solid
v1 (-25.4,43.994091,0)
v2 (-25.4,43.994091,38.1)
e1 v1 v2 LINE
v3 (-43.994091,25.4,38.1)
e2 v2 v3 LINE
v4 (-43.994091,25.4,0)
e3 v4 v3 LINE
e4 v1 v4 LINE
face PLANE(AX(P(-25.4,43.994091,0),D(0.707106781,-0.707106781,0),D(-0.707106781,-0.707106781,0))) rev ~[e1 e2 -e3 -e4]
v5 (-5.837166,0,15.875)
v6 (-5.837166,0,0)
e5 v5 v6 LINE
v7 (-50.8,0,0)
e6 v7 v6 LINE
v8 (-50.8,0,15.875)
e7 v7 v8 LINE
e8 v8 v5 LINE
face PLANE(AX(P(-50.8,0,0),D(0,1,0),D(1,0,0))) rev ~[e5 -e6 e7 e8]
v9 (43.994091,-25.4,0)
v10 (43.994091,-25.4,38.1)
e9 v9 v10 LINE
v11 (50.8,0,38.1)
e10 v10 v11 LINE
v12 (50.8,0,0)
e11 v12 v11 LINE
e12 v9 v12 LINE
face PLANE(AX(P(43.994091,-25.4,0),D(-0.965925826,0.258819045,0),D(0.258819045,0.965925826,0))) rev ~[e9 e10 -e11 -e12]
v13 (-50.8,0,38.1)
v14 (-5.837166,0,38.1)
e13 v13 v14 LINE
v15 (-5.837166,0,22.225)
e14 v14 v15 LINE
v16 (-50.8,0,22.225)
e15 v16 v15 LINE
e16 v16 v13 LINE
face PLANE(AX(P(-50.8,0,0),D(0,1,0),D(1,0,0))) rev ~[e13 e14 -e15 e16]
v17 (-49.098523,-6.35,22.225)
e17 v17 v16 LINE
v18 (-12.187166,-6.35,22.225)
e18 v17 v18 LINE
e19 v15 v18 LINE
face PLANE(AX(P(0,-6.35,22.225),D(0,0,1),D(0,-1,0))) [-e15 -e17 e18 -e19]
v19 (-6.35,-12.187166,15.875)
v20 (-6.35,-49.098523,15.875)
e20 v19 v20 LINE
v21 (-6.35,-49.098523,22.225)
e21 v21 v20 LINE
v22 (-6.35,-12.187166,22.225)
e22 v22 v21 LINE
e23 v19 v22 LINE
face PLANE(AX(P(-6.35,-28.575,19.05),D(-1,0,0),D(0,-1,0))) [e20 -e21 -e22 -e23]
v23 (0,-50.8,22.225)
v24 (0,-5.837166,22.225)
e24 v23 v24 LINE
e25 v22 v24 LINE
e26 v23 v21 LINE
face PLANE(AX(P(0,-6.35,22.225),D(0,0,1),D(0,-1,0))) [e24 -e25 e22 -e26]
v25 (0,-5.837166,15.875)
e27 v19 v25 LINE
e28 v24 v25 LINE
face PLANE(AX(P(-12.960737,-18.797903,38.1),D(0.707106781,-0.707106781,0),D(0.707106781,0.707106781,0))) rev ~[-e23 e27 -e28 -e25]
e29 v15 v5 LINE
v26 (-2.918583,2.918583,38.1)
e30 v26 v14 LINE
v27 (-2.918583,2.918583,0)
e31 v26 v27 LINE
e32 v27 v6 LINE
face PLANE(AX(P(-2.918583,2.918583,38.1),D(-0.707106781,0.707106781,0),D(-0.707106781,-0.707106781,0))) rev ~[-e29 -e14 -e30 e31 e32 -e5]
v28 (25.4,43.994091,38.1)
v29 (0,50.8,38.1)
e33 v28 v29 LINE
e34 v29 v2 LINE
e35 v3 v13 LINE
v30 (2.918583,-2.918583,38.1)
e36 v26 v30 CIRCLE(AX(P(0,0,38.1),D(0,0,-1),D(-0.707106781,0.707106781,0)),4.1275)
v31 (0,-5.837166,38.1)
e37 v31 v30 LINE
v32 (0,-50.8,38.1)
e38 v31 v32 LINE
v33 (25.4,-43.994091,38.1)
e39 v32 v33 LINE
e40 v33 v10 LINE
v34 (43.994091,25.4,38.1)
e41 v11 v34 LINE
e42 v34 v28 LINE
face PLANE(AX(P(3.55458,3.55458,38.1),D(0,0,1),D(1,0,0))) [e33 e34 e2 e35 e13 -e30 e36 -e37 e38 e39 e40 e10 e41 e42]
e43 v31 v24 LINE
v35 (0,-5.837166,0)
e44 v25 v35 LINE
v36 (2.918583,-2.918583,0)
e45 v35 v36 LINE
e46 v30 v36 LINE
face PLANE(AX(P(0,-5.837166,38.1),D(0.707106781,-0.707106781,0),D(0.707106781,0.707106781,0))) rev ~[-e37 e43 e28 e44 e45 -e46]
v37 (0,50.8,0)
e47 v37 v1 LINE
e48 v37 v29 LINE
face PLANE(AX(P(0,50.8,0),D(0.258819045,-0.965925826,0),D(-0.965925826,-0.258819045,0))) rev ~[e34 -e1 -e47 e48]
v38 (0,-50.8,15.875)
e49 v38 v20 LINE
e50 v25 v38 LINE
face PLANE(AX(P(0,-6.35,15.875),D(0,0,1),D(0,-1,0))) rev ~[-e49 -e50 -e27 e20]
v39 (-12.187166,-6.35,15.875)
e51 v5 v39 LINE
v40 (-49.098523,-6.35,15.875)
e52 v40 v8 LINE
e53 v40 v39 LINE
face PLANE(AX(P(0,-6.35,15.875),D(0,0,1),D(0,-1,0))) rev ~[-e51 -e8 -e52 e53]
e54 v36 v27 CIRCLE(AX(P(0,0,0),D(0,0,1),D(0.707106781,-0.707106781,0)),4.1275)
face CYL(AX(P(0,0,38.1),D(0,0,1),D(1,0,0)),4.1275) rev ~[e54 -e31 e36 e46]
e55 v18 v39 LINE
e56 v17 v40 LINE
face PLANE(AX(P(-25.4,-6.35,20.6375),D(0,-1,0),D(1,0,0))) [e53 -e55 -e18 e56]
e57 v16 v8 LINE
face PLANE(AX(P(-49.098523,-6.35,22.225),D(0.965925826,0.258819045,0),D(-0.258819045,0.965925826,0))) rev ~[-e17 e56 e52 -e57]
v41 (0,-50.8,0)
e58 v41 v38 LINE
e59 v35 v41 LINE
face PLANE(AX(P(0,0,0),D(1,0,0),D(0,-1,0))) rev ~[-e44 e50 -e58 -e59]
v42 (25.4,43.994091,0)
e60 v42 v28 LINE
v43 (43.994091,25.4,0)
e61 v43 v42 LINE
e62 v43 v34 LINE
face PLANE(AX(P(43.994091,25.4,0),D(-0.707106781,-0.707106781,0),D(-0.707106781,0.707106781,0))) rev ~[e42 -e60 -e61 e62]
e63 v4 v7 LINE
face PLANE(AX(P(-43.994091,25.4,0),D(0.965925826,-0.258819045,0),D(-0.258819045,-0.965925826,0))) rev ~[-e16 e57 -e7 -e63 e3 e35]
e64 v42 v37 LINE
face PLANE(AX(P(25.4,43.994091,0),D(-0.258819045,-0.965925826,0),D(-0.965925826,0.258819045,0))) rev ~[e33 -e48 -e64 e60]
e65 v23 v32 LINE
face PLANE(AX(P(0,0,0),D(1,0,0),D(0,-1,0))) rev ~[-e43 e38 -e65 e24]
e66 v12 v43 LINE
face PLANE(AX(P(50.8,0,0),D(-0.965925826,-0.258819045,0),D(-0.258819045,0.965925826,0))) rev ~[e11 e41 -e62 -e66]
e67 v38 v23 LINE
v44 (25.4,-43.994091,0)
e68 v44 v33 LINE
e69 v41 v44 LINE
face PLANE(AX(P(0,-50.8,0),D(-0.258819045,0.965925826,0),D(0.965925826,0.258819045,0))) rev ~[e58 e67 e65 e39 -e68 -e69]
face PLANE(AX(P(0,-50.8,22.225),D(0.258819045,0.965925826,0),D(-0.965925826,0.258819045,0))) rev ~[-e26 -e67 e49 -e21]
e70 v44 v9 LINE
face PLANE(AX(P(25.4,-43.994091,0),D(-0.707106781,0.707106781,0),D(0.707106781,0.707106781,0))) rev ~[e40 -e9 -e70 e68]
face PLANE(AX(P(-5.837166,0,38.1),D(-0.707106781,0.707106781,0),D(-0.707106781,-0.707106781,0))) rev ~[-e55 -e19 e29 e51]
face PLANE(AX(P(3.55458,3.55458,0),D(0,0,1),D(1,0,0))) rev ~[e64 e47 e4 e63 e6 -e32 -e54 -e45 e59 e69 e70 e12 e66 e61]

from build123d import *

# Parameters (mm, degrees)
F1_DEPTH  = 38.1
F2_W      = 50.8
F2_H      = 3.175
F3_DEPTH  = 6.35
F5_DEPTH  = 25.4
F6_W      = 44.45
F6_H      = 6.35
F7_DEPTH  = 6.35
F9_DEPTH  = 25.4
F10_R     = 4.1275
F11_DEPTH = 127
F13_DEPTH = 127


# Not quite as in the source:
# - a feature names something its author has since deleted; it is built from what else it names


with BuildPart() as f1:
    # F0 (on Top) → F1 (new body)
    with BuildSketch(Plane.XY):
        Polygon((43.9940905122, -25.4), (50.8, 0), (43.9940905122, 25.4), (25.4, 43.9940905122), (0, 50.8), (-25.4, 43.9940905122), (-43.9940905122, 25.4), (-50.8, 0), (0, 0), (0, -50.8), (25.4, -43.9940905122), align=None)
    extrude(amount=F1_DEPTH)

    # F2 (on face) → F3 (join)
    with BuildSketch(Plane.XZ):
        with Locations((-25.4, 20.6375)):
            Rectangle(F2_W, F2_H)
        with Locations((-25.4, 17.4625)):
            Rectangle(F2_W, F2_H)
    extrude(amount=F3_DEPTH)

    # F4 (on face) → F5 (cut)
    with BuildSketch(Plane.XY.offset(22.225)):
        Polygon((-49.0985226281, -6.35), (-50.8, 0), (-50.8, -6.35), align=None)
    extrude(amount=-F5_DEPTH, mode=Mode.SUBTRACT)

    # F6 (on face) → F7 (join)
    with BuildSketch(Plane(origin=(0, 0, 0), x_dir=(0, -1, 0), z_dir=(-1, 0, 0))):
        with Locations((28.575, 19.05)):
            Rectangle(F6_W, F6_H)
    extrude(amount=F7_DEPTH)

    # F8 (on face) → F9 (cut)
    with BuildSketch(Plane.XY.offset(22.225)):
        Polygon((-6.35, -50.8), (0, -50.8), (-6.35, -49.0985226281), align=None)
    extrude(amount=-F9_DEPTH, mode=Mode.SUBTRACT)

    # F10 (on face) → F11 (cut)
    with BuildSketch(Plane.XY.offset(38.1)):
        Circle(F10_R)
    extrude(amount=-F11_DEPTH, mode=Mode.SUBTRACT)

    # F12 (on face) → F13 (cut)
    with BuildSketch(Plane.XY.offset(38.1)):
        with BuildLine():
            ThreePointArc((-4.1275, 0), (-3.8133127704, 1.5795258671), (-2.9185832393, 2.9185832393))
            Line((-2.9185832393, 2.9185832393), (-5.8371664787, 0))
            Line((-5.8371664787, 0), (-4.1275, 0))
        make_face()
        with BuildLine():
            ThreePointArc((4.1275, 0), (1.5795258671, 3.8133127704), (-2.9185832393, 2.9185832393))
            ThreePointArc((-2.9185832393, 2.9185832393), (-3.8133127704, 1.5795258671), (-4.1275, 0))
            Line((-4.1275, 0), (-5.8371664787, 0))
            Line((-5.8371664787, 0), (-18.7979032201, -12.9607367414))
            Line((-18.7979032201, -12.9607367414), (-12.9607367414, -18.7979032201))
            Line((-12.9607367414, -18.7979032201), (0, -5.8371664787))
            Line((0, -5.8371664787), (0, -4.1275))
            ThreePointArc((0, -4.1275), (1.5795258671, -3.8133127704), (2.9185832393, -2.9185832393))
            ThreePointArc((2.9185832393, -2.9185832393), (3.8133127704, -1.5795258671), (4.1275, 0))
        make_face()
        with BuildLine():
            Line((0, -5.8371664787), (2.9185832393, -2.9185832393))
            ThreePointArc((2.9185832393, -2.9185832393), (1.5795258671, -3.8133127704), (0, -4.1275))
            Line((0, -4.1275), (0, -5.8371664787))
        make_face()
    extrude(amount=-F13_DEPTH, mode=Mode.SUBTRACT)


solid = f1.part
